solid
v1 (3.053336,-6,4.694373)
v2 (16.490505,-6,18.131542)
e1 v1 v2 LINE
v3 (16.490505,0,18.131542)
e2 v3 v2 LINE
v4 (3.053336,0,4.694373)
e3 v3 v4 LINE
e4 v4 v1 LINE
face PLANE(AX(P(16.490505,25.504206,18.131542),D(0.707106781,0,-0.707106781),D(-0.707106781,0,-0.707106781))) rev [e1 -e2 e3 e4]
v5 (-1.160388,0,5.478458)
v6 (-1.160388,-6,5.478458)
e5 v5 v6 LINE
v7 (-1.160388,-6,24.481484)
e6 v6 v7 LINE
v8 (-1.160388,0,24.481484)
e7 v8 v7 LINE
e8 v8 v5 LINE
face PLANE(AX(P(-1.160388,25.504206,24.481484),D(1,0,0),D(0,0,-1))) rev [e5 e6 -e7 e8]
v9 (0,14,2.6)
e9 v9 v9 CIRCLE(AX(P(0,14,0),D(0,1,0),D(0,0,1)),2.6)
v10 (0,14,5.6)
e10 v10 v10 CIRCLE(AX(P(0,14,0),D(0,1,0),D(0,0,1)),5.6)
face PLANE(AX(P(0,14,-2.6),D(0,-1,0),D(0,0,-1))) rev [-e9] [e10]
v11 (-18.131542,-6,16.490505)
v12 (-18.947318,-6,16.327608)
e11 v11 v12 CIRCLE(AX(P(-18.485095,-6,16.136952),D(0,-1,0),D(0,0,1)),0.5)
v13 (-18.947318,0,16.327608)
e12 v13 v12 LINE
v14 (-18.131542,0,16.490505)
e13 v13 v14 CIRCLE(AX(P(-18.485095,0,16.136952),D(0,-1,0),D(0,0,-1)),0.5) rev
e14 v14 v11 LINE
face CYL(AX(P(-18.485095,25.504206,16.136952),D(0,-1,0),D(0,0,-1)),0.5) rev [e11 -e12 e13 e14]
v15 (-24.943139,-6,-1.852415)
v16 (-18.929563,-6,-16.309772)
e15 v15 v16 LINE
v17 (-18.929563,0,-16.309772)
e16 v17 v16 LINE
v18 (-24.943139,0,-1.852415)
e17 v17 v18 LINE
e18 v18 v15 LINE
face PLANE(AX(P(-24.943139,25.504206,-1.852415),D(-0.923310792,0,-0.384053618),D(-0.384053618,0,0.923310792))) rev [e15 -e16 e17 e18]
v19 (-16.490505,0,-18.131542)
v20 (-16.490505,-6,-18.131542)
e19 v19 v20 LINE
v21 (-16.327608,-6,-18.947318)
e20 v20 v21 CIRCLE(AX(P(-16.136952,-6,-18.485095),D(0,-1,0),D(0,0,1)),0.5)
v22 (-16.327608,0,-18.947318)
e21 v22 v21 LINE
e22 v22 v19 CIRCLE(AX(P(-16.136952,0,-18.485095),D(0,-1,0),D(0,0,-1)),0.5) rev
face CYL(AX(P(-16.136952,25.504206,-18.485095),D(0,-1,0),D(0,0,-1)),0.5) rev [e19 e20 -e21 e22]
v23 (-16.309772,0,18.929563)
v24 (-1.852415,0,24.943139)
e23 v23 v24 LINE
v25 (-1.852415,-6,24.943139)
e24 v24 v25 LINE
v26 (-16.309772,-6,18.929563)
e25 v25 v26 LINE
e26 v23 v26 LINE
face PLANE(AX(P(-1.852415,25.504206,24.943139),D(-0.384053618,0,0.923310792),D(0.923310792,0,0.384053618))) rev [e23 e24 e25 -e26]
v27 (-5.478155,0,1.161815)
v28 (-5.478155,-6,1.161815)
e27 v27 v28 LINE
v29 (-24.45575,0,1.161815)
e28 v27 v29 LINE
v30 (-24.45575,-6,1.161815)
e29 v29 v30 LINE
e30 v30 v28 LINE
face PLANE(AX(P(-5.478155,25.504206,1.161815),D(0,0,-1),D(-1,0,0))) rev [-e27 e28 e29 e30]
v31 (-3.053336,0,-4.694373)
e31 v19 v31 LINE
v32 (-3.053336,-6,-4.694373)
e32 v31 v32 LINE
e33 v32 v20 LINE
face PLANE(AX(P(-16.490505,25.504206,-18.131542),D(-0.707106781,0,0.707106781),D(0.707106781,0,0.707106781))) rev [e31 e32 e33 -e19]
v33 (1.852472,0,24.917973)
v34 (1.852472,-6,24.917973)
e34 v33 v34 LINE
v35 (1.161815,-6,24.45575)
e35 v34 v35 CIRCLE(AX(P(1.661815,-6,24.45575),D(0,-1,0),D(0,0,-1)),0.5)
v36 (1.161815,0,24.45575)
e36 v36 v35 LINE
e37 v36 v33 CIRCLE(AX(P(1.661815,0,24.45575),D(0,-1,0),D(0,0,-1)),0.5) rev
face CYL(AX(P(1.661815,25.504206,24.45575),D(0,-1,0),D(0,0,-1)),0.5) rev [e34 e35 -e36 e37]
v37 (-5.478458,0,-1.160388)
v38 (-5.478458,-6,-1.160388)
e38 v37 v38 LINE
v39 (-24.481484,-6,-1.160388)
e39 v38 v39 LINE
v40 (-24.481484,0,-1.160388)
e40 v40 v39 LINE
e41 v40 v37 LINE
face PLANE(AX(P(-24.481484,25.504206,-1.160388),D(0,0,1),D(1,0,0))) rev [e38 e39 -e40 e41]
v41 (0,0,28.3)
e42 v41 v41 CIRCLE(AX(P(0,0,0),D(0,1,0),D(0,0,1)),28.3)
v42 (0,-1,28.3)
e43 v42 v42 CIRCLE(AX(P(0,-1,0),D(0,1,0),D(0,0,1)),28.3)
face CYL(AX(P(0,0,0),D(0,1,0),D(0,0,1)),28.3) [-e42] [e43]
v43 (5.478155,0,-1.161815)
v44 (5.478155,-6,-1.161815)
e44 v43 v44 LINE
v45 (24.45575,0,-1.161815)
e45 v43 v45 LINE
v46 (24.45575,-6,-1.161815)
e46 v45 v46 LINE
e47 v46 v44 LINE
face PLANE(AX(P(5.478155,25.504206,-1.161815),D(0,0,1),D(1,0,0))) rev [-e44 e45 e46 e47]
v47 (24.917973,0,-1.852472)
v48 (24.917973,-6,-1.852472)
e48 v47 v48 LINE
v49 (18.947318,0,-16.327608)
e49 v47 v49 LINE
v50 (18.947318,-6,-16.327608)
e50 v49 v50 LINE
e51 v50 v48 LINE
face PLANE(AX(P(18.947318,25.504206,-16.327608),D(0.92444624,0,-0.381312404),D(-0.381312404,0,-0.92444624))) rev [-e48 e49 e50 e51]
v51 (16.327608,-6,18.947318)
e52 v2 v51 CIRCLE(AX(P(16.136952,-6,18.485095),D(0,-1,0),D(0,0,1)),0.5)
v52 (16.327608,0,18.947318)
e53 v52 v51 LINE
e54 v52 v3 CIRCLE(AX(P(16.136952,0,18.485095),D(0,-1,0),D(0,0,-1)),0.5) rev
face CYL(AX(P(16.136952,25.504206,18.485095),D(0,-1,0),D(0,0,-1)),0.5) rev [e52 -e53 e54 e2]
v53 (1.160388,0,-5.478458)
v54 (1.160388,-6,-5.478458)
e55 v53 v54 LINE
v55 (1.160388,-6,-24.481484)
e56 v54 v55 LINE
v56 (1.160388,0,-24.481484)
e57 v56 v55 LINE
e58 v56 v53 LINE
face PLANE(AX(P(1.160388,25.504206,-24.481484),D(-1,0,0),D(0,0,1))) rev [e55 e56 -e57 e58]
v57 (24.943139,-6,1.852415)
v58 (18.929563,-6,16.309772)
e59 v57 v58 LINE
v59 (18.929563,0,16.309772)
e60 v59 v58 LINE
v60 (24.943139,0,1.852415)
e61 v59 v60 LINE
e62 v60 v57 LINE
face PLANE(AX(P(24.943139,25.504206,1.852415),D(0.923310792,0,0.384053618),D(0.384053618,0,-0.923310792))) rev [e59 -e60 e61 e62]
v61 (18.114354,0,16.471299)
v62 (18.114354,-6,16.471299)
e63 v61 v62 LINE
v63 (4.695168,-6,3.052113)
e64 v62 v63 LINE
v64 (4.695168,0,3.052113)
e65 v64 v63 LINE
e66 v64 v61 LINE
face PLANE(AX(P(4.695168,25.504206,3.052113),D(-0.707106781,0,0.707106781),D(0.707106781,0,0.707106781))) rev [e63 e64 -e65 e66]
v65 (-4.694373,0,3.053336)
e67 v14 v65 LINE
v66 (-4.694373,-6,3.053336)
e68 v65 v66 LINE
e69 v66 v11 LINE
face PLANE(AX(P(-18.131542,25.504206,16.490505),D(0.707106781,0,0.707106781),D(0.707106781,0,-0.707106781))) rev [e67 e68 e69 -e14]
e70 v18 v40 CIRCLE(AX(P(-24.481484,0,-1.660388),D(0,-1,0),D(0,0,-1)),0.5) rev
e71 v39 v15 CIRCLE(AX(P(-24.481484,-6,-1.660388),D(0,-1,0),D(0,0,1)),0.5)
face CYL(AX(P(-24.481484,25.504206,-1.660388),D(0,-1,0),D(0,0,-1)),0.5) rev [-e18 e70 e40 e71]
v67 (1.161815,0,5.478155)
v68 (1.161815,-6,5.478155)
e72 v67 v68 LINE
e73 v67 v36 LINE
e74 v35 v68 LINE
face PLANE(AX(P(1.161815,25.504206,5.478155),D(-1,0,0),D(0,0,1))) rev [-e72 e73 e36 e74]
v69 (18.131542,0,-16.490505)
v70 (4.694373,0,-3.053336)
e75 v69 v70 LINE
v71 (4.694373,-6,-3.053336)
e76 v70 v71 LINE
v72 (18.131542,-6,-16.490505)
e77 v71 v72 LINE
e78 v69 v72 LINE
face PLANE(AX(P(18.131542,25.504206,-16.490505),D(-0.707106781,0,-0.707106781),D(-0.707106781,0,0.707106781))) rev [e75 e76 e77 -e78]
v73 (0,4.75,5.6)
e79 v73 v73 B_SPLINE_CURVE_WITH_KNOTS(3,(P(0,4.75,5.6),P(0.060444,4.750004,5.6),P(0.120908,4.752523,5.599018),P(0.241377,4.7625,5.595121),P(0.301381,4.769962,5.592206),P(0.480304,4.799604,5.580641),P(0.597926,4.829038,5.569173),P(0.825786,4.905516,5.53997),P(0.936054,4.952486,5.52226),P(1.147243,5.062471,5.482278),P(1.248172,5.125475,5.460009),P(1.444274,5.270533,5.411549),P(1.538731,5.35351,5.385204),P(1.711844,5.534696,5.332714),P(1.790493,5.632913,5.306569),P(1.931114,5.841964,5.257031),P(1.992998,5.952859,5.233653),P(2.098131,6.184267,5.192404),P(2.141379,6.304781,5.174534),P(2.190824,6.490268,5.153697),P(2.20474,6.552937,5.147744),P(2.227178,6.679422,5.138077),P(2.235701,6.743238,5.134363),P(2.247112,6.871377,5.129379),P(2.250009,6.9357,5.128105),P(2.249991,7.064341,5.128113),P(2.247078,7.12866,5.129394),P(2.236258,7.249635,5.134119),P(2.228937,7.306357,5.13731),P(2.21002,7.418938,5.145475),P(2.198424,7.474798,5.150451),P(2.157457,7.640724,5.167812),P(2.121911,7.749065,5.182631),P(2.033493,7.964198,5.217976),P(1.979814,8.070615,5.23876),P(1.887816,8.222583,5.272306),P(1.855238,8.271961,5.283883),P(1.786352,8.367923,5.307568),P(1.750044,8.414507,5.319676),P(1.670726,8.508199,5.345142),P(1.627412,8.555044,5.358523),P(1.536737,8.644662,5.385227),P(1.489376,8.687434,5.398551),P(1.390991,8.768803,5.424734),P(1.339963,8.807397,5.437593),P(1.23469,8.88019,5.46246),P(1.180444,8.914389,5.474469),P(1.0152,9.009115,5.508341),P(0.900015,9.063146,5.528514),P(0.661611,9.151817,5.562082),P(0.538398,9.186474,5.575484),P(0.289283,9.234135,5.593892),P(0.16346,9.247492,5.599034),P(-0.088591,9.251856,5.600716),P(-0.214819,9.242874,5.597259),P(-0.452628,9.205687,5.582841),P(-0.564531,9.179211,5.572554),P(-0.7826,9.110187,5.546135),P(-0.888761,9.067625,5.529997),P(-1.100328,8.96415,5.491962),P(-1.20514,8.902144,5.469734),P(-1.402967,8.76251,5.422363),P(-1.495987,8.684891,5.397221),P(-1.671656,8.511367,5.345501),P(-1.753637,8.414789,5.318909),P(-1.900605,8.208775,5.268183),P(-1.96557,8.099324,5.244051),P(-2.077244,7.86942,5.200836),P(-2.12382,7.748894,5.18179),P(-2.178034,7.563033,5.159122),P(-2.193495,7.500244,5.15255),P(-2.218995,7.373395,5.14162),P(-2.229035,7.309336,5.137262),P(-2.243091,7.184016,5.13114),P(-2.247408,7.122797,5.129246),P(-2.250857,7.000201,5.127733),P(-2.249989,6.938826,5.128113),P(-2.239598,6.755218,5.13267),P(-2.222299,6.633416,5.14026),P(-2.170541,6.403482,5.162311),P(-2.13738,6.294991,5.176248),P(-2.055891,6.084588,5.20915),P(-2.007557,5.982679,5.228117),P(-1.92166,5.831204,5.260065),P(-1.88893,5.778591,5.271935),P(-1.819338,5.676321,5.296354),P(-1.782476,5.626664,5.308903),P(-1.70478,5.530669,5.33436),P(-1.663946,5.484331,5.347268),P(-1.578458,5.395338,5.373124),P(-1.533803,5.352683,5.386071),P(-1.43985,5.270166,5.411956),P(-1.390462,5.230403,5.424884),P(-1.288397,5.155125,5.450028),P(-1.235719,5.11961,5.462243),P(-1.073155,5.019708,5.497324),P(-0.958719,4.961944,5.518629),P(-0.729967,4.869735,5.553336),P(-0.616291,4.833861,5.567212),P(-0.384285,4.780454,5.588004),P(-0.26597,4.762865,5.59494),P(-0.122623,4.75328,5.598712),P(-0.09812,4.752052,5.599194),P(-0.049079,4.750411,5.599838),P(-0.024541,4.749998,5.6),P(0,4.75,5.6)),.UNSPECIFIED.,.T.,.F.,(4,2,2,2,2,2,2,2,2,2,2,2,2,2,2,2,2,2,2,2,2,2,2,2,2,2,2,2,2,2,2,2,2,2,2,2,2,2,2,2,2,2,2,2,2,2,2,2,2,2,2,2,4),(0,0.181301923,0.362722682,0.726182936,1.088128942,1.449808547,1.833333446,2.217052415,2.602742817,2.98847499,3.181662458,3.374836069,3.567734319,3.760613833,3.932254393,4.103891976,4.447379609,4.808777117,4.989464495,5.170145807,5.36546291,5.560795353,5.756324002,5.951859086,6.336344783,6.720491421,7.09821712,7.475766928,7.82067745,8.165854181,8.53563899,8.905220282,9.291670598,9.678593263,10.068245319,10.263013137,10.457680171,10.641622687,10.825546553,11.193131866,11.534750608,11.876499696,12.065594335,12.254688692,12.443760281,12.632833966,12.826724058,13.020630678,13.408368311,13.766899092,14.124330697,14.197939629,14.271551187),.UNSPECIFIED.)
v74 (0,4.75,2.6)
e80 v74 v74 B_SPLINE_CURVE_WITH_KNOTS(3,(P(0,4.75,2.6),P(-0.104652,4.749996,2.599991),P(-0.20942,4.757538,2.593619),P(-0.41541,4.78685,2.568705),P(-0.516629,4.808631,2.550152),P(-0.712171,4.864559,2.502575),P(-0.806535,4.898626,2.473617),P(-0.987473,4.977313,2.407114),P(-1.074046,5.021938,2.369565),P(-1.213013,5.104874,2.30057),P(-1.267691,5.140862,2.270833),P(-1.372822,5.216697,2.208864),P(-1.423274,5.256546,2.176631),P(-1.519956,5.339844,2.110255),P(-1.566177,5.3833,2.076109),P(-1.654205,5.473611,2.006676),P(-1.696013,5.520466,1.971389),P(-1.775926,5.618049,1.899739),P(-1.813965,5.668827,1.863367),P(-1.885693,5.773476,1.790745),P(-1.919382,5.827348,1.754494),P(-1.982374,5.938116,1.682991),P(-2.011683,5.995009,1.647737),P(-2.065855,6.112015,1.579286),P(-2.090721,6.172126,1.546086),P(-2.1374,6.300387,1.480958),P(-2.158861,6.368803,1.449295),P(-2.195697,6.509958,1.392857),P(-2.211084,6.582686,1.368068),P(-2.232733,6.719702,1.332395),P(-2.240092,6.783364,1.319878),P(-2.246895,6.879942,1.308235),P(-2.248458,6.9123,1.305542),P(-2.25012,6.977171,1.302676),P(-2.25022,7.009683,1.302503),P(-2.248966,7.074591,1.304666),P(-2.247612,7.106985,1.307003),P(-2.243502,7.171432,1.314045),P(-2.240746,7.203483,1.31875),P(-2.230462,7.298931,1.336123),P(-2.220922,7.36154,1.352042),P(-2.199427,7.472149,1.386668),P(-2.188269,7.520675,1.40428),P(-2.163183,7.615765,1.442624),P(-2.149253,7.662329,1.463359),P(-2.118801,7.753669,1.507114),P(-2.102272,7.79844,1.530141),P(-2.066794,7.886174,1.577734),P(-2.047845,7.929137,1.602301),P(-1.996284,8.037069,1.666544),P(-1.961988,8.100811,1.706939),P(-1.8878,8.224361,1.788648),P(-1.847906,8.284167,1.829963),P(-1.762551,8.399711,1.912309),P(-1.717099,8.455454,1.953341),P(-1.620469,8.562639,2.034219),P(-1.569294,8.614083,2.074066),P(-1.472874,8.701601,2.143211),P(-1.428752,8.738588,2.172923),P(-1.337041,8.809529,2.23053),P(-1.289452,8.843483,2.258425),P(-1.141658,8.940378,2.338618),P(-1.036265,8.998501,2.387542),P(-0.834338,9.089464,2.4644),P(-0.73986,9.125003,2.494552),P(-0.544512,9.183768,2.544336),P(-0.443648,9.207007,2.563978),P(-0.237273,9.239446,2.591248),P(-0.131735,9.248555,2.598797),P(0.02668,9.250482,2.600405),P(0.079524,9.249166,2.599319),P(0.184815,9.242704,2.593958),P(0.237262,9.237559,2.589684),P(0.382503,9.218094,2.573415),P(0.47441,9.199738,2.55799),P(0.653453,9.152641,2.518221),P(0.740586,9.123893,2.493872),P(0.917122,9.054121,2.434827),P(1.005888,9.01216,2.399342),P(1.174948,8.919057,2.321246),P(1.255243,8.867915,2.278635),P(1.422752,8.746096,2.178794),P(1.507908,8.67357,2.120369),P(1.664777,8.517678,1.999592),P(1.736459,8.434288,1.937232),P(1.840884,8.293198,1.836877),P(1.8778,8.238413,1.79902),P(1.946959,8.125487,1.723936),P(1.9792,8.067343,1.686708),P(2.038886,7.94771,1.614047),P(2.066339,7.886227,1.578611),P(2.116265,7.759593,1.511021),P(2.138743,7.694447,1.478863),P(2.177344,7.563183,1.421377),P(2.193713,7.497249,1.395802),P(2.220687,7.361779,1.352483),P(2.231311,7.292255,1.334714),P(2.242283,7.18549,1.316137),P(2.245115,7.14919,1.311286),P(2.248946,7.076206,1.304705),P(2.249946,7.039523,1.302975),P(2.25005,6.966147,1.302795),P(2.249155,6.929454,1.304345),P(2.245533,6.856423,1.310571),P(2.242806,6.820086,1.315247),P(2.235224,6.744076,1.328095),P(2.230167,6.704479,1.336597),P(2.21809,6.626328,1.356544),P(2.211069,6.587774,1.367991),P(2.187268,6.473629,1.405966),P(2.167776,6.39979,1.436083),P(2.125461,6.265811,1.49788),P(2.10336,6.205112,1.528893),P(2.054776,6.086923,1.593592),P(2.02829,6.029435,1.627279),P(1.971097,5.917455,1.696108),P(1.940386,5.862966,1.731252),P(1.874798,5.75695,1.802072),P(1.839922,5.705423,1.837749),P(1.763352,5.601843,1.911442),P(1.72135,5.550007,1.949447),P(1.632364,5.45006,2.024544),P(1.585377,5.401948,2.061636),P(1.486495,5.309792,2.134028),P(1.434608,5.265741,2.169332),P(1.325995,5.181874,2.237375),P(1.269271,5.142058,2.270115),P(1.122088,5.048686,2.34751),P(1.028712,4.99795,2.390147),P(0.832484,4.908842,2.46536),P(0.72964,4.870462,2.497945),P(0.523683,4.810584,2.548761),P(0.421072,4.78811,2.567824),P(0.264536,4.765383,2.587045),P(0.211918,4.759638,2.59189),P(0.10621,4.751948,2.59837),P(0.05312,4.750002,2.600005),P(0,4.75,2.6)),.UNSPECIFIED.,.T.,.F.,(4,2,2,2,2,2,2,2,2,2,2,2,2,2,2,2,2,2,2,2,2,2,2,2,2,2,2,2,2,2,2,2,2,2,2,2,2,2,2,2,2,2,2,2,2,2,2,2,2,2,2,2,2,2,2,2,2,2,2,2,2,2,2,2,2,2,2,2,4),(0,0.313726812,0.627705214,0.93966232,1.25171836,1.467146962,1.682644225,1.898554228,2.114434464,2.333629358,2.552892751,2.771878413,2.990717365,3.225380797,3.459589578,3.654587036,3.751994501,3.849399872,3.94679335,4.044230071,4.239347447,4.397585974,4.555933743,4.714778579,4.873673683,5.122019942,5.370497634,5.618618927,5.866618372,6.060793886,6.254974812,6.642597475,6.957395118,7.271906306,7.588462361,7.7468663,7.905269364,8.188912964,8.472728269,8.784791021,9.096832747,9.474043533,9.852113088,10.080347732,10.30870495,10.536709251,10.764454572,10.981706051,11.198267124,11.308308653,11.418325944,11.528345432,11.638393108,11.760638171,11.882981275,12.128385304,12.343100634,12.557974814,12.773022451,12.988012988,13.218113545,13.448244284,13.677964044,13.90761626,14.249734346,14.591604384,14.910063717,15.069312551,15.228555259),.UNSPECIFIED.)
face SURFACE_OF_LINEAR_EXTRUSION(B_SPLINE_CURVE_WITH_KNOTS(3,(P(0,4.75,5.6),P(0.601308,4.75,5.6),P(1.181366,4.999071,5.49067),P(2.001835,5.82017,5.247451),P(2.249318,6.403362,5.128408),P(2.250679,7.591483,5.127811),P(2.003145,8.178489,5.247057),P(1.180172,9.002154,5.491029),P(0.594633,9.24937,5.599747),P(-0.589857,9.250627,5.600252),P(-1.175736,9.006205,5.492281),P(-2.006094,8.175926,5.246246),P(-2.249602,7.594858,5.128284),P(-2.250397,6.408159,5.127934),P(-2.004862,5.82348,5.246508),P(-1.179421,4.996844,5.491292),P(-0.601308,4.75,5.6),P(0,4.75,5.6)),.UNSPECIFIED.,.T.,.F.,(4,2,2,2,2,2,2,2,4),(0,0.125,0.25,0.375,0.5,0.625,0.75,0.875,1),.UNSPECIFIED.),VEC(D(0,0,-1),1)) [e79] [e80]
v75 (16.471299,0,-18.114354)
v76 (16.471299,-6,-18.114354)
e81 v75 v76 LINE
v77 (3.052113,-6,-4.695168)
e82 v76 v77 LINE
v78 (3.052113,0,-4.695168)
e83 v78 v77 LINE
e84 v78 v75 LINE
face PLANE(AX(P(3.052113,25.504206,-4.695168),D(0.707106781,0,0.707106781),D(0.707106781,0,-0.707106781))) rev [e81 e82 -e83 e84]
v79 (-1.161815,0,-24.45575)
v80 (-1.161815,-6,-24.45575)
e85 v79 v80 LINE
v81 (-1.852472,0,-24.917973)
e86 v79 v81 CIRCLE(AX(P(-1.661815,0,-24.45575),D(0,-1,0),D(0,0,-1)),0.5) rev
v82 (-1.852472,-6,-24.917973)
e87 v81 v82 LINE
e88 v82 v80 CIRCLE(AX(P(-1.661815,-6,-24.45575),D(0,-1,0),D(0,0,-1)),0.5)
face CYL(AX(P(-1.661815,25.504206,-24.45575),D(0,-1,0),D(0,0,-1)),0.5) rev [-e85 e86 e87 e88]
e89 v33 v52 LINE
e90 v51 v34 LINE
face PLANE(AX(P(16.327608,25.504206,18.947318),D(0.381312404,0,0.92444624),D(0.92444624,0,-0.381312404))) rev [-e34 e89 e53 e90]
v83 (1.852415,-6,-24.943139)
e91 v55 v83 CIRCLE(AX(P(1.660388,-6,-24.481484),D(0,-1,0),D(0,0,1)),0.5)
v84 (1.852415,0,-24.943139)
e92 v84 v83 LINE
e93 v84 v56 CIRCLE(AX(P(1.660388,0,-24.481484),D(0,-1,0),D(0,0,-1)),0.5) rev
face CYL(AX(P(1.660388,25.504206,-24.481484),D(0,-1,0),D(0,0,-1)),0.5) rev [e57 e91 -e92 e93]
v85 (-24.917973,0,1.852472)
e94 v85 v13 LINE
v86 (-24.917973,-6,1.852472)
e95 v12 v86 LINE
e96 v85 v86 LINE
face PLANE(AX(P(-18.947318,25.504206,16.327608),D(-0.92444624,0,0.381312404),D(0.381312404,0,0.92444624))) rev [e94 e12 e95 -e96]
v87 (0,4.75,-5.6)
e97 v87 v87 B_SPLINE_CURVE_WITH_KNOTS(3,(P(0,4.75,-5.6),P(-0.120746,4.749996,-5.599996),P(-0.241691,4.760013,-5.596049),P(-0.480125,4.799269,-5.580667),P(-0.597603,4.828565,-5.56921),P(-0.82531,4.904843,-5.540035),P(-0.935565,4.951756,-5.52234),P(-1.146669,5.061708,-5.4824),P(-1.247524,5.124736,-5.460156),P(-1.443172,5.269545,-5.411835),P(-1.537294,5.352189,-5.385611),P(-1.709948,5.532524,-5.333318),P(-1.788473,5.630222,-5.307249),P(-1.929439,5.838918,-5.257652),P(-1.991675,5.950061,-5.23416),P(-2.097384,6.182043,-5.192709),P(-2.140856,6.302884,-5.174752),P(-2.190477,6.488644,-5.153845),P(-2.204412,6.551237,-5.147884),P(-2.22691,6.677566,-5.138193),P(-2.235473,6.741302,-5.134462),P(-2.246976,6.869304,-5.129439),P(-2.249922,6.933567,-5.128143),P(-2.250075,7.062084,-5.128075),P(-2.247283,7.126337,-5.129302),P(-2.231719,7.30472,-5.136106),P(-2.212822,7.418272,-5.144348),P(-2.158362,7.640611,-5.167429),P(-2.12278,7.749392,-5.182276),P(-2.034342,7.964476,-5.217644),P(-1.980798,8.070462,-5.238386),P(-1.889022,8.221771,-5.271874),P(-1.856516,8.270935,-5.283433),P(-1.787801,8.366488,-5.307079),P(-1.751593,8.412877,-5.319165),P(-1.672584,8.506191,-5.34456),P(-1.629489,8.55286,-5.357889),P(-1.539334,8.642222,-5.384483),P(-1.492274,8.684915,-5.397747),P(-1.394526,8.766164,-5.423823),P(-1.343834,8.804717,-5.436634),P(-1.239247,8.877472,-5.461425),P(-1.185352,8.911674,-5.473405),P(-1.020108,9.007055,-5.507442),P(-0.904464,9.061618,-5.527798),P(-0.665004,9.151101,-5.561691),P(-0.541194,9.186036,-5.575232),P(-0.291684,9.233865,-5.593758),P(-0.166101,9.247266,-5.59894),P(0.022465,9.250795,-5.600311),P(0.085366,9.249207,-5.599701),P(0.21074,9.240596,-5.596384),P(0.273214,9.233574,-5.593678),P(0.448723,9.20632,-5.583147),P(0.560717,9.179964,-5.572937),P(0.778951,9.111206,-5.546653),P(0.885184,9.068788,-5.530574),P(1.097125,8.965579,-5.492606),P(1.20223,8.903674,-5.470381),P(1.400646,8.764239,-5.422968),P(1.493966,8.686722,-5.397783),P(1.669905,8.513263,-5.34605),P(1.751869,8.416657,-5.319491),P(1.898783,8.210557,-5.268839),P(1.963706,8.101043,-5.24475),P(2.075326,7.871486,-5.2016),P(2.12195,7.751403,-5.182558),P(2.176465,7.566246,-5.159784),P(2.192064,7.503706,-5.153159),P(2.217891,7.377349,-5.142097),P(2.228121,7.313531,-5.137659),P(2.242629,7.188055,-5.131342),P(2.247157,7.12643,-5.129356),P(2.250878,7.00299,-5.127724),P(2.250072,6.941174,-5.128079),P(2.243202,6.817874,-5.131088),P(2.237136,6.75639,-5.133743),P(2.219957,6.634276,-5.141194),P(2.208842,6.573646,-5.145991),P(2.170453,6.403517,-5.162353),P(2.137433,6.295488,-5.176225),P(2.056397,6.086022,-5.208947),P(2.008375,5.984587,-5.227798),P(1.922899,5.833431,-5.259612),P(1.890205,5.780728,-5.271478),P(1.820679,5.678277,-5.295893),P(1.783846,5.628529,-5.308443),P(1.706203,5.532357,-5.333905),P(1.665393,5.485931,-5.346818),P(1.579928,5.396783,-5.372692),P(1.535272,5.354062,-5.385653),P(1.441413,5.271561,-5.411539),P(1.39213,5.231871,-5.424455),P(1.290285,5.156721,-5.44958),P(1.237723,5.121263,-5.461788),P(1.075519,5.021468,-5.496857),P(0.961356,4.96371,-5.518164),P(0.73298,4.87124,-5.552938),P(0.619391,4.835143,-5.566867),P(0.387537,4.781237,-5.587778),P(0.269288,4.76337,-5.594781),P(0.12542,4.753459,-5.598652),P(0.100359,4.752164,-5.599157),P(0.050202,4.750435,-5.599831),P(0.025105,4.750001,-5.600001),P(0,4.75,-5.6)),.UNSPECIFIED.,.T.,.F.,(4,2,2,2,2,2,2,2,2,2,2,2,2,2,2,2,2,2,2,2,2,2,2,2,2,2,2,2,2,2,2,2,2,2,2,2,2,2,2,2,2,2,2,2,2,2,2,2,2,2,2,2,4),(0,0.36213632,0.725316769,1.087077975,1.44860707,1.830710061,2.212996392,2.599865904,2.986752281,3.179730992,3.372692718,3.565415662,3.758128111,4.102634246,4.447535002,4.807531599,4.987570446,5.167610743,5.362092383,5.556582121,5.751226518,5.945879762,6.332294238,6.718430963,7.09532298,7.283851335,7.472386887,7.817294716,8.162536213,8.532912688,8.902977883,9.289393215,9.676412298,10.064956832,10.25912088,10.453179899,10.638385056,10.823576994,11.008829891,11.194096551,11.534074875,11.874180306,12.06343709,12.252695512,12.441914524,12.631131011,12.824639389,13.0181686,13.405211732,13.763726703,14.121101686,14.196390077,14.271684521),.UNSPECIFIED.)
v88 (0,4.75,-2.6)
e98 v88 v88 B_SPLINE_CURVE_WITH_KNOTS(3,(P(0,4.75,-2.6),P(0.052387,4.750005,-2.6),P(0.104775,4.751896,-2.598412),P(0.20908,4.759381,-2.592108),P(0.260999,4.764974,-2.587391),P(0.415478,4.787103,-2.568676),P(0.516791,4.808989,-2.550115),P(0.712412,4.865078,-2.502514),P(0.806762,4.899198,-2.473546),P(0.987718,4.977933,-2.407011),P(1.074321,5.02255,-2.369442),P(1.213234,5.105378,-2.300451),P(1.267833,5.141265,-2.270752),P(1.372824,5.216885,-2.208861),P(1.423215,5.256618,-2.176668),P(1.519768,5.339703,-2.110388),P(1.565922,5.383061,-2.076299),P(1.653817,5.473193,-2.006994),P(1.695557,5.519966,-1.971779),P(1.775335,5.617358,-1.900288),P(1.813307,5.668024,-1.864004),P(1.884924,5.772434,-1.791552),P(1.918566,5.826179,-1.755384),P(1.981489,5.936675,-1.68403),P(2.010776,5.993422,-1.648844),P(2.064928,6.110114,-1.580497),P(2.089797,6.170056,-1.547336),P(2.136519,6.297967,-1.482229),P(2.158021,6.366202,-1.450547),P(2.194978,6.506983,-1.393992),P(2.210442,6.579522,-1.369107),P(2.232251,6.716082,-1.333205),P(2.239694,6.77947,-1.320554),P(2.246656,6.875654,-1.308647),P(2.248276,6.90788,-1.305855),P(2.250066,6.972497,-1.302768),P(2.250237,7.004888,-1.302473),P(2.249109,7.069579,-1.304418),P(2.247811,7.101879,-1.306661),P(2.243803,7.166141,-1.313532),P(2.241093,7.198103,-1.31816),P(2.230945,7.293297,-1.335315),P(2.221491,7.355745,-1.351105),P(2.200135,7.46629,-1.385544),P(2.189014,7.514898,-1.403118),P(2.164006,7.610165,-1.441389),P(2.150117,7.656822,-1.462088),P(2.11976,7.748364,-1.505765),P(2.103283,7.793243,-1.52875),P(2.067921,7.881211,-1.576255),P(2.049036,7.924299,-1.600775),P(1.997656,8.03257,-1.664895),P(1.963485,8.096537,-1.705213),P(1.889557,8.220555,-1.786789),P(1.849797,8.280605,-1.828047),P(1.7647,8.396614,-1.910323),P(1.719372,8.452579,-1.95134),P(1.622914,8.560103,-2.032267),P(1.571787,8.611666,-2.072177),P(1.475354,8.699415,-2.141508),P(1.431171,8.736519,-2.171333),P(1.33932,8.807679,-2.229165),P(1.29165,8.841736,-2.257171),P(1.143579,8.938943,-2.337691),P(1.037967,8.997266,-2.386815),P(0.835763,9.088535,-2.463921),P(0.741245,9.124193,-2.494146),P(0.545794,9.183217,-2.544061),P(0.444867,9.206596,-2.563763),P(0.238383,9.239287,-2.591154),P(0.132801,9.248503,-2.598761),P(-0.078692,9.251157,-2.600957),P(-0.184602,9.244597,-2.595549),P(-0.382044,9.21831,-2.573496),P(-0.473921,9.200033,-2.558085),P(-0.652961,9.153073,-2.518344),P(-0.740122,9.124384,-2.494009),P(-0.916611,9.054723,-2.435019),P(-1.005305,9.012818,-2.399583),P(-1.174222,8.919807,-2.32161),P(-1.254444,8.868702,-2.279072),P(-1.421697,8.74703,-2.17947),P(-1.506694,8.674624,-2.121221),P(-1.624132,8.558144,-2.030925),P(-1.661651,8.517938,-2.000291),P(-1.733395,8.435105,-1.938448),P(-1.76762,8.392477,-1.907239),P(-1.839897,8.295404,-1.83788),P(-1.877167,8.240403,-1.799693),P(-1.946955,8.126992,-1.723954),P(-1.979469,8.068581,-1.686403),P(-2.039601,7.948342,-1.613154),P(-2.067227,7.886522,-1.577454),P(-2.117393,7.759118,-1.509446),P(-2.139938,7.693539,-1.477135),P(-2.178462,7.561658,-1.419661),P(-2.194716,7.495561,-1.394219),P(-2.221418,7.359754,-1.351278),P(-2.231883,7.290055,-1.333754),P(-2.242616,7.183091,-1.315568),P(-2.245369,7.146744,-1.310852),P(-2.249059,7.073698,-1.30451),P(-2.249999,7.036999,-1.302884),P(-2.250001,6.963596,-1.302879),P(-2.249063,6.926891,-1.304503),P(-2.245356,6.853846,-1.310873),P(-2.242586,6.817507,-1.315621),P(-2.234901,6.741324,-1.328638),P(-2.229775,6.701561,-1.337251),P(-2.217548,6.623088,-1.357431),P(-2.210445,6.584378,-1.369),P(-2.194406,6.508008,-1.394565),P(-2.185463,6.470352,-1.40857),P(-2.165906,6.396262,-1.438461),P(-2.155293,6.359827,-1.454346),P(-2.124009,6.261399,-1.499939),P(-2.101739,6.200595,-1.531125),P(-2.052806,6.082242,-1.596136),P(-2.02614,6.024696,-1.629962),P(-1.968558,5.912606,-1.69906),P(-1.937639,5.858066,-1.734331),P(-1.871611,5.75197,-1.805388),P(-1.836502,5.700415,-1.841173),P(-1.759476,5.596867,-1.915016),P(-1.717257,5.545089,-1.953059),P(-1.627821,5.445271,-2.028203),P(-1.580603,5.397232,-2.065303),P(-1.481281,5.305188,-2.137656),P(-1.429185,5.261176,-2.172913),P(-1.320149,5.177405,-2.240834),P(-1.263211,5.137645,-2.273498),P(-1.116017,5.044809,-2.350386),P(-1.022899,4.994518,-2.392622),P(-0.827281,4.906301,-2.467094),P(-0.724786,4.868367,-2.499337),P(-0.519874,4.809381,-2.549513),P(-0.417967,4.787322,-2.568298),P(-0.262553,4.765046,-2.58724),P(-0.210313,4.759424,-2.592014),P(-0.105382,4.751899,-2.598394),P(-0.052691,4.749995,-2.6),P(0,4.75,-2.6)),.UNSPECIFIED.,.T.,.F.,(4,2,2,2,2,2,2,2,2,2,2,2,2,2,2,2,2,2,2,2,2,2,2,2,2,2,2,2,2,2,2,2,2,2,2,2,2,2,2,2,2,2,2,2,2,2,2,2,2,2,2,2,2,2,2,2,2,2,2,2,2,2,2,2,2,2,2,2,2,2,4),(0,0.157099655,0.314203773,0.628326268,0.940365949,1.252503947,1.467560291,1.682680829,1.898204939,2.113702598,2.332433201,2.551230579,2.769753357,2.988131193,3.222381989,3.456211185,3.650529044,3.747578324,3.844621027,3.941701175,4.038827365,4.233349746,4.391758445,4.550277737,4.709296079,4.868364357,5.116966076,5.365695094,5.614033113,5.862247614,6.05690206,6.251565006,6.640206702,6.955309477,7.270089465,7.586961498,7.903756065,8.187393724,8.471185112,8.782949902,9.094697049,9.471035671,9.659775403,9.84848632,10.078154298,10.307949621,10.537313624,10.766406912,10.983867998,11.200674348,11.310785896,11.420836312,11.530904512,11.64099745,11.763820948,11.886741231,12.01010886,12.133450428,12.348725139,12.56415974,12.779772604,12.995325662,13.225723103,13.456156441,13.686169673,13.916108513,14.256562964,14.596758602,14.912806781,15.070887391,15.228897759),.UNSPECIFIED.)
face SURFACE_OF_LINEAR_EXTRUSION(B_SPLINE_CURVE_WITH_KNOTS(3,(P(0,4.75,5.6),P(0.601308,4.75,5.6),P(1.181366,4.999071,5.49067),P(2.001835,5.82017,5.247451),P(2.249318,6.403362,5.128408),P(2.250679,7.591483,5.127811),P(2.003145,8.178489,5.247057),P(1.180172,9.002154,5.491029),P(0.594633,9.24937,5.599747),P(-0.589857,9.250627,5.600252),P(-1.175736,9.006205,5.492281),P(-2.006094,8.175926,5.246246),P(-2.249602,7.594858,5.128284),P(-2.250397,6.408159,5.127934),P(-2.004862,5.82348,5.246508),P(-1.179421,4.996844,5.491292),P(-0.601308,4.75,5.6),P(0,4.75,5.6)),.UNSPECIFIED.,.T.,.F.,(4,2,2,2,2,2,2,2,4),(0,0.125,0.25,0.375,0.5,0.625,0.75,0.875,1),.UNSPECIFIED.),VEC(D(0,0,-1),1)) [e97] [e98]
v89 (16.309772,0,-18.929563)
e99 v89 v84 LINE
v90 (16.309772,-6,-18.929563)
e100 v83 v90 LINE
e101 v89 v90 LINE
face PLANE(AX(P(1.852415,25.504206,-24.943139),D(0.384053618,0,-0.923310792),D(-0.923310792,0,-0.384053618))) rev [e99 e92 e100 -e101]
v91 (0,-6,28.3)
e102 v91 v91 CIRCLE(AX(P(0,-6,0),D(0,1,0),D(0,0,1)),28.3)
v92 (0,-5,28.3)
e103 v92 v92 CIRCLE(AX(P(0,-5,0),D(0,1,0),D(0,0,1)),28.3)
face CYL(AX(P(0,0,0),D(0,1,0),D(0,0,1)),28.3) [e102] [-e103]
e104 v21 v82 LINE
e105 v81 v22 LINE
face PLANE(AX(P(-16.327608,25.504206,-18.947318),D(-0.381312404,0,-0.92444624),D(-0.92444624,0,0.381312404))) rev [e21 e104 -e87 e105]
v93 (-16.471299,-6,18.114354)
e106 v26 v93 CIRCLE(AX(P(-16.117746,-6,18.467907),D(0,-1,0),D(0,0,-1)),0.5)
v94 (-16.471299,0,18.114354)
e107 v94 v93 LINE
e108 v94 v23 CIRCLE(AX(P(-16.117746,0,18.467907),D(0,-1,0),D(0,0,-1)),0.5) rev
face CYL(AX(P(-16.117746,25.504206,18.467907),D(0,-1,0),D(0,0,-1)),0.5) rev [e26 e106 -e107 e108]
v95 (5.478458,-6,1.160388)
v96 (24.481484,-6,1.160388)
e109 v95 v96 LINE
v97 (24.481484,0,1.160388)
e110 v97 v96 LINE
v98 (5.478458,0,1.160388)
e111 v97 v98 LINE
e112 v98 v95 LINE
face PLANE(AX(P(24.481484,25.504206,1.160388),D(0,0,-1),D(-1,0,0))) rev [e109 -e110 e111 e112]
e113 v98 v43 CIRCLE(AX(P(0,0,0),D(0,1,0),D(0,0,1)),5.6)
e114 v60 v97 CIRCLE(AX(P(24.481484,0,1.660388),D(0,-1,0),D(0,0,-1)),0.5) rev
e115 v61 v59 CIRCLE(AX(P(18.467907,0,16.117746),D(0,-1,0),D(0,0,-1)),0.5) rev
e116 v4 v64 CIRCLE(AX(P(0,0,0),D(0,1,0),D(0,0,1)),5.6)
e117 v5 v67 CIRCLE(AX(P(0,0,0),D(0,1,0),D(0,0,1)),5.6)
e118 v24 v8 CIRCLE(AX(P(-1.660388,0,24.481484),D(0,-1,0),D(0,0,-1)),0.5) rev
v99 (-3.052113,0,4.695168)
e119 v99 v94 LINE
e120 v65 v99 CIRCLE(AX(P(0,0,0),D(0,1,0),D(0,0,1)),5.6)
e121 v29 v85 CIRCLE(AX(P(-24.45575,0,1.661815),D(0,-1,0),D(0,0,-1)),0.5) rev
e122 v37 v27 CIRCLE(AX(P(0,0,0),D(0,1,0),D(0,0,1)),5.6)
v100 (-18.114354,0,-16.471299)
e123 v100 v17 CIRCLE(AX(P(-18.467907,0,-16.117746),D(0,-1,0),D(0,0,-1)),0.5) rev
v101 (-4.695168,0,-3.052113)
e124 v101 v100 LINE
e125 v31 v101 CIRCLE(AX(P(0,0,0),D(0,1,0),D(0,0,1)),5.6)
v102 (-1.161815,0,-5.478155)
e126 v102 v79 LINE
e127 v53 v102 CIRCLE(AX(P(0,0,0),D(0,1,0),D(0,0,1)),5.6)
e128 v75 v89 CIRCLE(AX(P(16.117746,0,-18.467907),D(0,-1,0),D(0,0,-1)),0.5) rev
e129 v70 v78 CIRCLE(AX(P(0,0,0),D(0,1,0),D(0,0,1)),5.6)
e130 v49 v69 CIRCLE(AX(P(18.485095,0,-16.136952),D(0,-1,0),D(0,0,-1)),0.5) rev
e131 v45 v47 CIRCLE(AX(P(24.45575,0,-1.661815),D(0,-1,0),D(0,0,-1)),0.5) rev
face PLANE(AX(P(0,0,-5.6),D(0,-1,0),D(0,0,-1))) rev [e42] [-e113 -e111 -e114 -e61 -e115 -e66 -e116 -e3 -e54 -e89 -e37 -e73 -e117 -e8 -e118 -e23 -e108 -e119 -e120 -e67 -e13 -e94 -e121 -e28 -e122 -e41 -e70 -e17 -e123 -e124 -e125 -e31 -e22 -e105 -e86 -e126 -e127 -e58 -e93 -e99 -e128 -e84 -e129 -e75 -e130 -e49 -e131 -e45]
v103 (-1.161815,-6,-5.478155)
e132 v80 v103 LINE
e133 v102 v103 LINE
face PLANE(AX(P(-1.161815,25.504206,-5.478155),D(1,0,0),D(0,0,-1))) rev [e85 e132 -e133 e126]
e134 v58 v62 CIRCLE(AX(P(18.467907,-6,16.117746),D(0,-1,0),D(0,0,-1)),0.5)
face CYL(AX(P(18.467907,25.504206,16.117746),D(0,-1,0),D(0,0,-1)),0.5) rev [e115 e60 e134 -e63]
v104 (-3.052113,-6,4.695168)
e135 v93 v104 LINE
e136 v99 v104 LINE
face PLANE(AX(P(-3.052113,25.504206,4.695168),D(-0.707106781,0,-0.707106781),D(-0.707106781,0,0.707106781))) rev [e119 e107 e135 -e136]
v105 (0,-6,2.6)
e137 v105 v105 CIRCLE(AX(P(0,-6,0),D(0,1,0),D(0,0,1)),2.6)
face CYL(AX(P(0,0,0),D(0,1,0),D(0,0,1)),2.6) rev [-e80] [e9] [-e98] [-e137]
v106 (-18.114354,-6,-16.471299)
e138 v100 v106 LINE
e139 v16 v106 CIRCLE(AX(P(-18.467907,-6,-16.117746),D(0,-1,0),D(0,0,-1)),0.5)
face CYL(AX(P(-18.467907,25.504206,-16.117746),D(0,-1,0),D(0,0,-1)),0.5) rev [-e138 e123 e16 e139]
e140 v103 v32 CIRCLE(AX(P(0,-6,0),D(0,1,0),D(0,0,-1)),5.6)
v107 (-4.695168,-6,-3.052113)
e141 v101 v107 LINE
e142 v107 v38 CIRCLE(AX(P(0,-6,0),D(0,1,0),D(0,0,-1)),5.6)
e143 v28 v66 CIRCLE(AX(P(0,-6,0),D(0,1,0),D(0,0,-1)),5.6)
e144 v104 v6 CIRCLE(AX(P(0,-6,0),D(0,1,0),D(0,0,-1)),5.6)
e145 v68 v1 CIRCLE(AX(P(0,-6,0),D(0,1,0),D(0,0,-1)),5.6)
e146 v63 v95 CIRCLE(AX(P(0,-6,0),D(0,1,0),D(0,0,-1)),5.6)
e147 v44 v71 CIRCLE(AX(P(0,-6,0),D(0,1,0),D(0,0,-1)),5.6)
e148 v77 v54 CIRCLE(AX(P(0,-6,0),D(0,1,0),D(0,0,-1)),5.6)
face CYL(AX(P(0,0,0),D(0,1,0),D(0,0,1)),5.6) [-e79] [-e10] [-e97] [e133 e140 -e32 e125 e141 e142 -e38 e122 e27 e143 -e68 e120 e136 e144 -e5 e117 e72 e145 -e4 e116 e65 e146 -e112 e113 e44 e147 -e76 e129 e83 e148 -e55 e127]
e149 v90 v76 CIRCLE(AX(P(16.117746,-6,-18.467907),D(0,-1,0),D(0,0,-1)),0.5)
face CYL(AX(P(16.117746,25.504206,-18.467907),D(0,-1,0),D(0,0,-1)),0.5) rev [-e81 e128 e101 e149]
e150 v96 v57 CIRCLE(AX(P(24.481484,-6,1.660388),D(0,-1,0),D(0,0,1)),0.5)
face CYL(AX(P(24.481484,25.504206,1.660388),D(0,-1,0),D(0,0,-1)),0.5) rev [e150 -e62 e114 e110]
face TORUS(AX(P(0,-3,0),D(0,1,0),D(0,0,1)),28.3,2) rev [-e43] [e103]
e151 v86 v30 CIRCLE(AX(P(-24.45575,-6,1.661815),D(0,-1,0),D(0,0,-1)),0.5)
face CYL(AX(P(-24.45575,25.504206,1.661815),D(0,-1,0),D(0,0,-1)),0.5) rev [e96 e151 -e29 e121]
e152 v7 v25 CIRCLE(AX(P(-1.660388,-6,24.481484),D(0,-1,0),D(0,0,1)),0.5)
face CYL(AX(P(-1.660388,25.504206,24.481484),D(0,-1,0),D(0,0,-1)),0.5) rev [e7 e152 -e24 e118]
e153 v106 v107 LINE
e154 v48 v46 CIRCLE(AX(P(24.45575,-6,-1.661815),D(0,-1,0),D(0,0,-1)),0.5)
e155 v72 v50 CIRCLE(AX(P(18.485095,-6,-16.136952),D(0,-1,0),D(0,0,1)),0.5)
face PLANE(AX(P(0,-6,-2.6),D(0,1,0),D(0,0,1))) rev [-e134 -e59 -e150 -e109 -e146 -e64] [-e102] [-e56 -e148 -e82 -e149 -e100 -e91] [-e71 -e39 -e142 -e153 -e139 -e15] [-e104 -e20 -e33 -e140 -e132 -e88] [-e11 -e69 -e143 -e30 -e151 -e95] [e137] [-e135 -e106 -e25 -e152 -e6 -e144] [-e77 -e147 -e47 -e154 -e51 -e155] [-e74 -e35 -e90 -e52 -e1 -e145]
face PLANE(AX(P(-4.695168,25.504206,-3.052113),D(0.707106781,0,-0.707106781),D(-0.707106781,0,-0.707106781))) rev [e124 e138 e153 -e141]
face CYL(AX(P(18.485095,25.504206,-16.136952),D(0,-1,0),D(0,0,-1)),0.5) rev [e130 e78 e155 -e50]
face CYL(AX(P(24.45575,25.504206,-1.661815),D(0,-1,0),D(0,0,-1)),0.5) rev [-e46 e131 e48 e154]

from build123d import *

# Parameters (mm, degrees)
ENL_V_START             = -5.600001354
ENL_V_MAT_EXTRU_1_DEPTH = 11.200001454
ENL_V_MAT_EXTRU_3_DEPTH = 6


# Read off the part's stored shape, not the designer's step: Enlèv. mat.-Extru.1
with BuildPart() as part:
    # Esquisse1 → Révolution1 (revolve)
    with BuildSketch(Plane(origin=(0, 0, 0), x_dir=(0, 0, -1), z_dir=(1, 0, 0)), mode=Mode.PRIVATE) as r_volution1_sk:
        with BuildLine():
            Line((5.6, 0), (28.3, 0))
            Line((28.3, 0), (28.3, -1))
            ThreePointArc((28.3, -1), (26.3, -3), (28.3, -5))
            Line((28.3, -5), (28.3, -6))
            Line((28.3, -6), (2.6, -6))
            Line((2.6, -6), (2.6, 0))
            Line((2.6, 0), (2.6, 14))
            Line((2.6, 14), (5.6, 14))
            Line((5.6, 14), (5.6, 0))
        make_face()
    revolve(r_volution1_sk.sketch.rotate(Axis((0, 0, 0), (0, -1, 0)), 180), axis=Axis((0, 0, 0), (0, -1, 0)))

    # Enlèv. mat.-Extru.1 outline → Enlèv. mat.-Extru.1 (cut)
    with BuildSketch(Plane.XY.offset(ENL_V_START)):
        with BuildLine():
            add(Edge.make_bspline(
                [(0, 4.75), (0.6013076, 4.75), (1.181365788, 4.999070592), (2.001835342, 5.820169976), (2.249317955, 6.403361701), (2.250679092, 7.591483004), (2.003145141, 8.178489261), (1.180171672, 9.002154395), (0.594632574, 9.249370285), (-0.589857498, 9.250627181), (-1.17573609, 9.006205165), (-2.00609398, 8.175925788), (-2.249601609, 7.594858131), (-2.250397379, 6.408159453), (-2.004861685, 5.823479927), (-1.179421259, 4.996843653), (-0.6013076, 4.75), (0, 4.75)],
                knots=[0, 0, 0, 0, 0.125, 0.125, 0.25, 0.25, 0.375, 0.375, 0.5, 0.5, 0.625, 0.625, 0.75, 0.75, 0.875, 0.875, 1, 1, 1, 1], degree=3))
        make_face()
    extrude(amount=ENL_V_MAT_EXTRU_1_DEPTH, mode=Mode.SUBTRACT)

    # Esquisse3 → Enlèv. mat.-Extru.3 (cut)
    with BuildSketch(Plane.XZ.offset(6)):
        with BuildLine():
            Line((-1.161815326, -5.478155269), (-1.161815326, -24.455749626))
            ThreePointArc((-1.161815326, -24.455749626), (-1.383721907, -24.871278266), (-1.852471528, -24.917972746))
            Line((-1.852471528, -24.917972746), (-16.327607753, -18.947318365))
            ThreePointArc((-16.327607753, -18.947318365), (-16.6272717, -18.583004137), (-16.490504941, -18.131541855))
            Line((-16.490504941, -18.131541855), (-3.053336143, -4.694373057))
            ThreePointArc((-3.053336143, -4.694373057), (-2.143701032, -5.173446229), (-1.161815326, -5.478155269))
        make_face()
        with BuildLine():
            Line((-24.481484068, -1.16038833), (-5.478457714, -1.16038833))
            ThreePointArc((-5.478457714, -1.16038833), (-5.174004447, -2.142353374), (-4.695168234, -3.052113244))
            Line((-4.695168234, -3.052113244), (-18.114353895, -16.471298904))
            ThreePointArc((-18.114353895, -16.471298904), (-18.565088662, -16.608210375), (-18.929562681, -16.309772323))
            Line((-18.929562681, -16.309772323), (-24.943139464, -1.852415139))
            ThreePointArc((-24.943139464, -1.852415139), (-24.897424812, -1.382911668), (-24.481484068, -1.16038833))
        make_face()
        with BuildLine():
            Line((-18.131541855, 16.490504941), (-4.694373057, 3.053336143))
            ThreePointArc((-4.694373057, 3.053336143), (-5.173446229, 2.143701032), (-5.478155269, 1.161815326))
            Line((-5.478155269, 1.161815326), (-24.455749626, 1.161815326))
            ThreePointArc((-24.455749626, 1.161815326), (-24.871278266, 1.383721907), (-24.917972746, 1.852471528))
            Line((-24.917972746, 1.852471528), (-18.947318365, 16.327607753))
            ThreePointArc((-18.947318365, 16.327607753), (-18.583004137, 16.6272717), (-18.131541855, 16.490504941))
        make_face()
        with BuildLine():
            Line((-1.16038833, 24.481484068), (-1.16038833, 5.478457714))
            ThreePointArc((-1.16038833, 5.478457714), (-2.142353374, 5.174004447), (-3.052113244, 4.695168234))
            Line((-3.052113244, 4.695168234), (-16.471298904, 18.114353895))
            ThreePointArc((-16.471298904, 18.114353895), (-16.608210375, 18.565088662), (-16.309772323, 18.929562681))
            Line((-16.309772323, 18.929562681), (-1.852415139, 24.943139464))
            ThreePointArc((-1.852415139, 24.943139464), (-1.382911668, 24.897424812), (-1.16038833, 24.481484068))
        make_face()
        with BuildLine():
            Line((16.490504941, 18.131541855), (3.053336143, 4.694373057))
            ThreePointArc((3.053336143, 4.694373057), (2.143701032, 5.173446229), (1.161815326, 5.478155269))
            Line((1.161815326, 5.478155269), (1.161815326, 24.455749626))
            ThreePointArc((1.161815326, 24.455749626), (1.383721907, 24.871278266), (1.852471528, 24.917972746))
            Line((1.852471528, 24.917972746), (16.327607753, 18.947318365))
            ThreePointArc((16.327607753, 18.947318365), (16.6272717, 18.583004137), (16.490504941, 18.131541855))
        make_face()
        with BuildLine():
            Line((24.481484068, 1.16038833), (5.478457714, 1.16038833))
            ThreePointArc((5.478457714, 1.16038833), (5.174004447, 2.142353374), (4.695168234, 3.052113244))
            Line((4.695168234, 3.052113244), (18.114353895, 16.471298904))
            ThreePointArc((18.114353895, 16.471298904), (18.565088662, 16.608210375), (18.929562681, 16.309772323))
            Line((18.929562681, 16.309772323), (24.943139464, 1.852415139))
            ThreePointArc((24.943139464, 1.852415139), (24.897424812, 1.382911668), (24.481484068, 1.16038833))
        make_face()
        with BuildLine():
            Line((18.131541855, -16.490504941), (4.694373057, -3.053336143))
            ThreePointArc((4.694373057, -3.053336143), (5.173446229, -2.143701032), (5.478155269, -1.161815326))
            Line((5.478155269, -1.161815326), (24.455749626, -1.161815326))
            ThreePointArc((24.455749626, -1.161815326), (24.871278266, -1.383721907), (24.917972746, -1.852471528))
            Line((24.917972746, -1.852471528), (18.947318365, -16.327607753))
            ThreePointArc((18.947318365, -16.327607753), (18.583004137, -16.6272717), (18.131541855, -16.490504941))
        make_face()
        with BuildLine():
            Line((1.16038833, -24.481484068), (1.16038833, -5.478457714))
            ThreePointArc((1.16038833, -5.478457714), (2.142353374, -5.174004447), (3.052113244, -4.695168234))
            Line((3.052113244, -4.695168234), (16.471298904, -18.114353895))
            ThreePointArc((16.471298904, -18.114353895), (16.608210375, -18.565088662), (16.309772323, -18.929562681))
            Line((16.309772323, -18.929562681), (1.852415139, -24.943139464))
            ThreePointArc((1.852415139, -24.943139464), (1.382911668, -24.897424812), (1.16038833, -24.481484068))
        make_face()
    extrude(amount=-ENL_V_MAT_EXTRU_3_DEPTH, mode=Mode.SUBTRACT)


solid = part.part
